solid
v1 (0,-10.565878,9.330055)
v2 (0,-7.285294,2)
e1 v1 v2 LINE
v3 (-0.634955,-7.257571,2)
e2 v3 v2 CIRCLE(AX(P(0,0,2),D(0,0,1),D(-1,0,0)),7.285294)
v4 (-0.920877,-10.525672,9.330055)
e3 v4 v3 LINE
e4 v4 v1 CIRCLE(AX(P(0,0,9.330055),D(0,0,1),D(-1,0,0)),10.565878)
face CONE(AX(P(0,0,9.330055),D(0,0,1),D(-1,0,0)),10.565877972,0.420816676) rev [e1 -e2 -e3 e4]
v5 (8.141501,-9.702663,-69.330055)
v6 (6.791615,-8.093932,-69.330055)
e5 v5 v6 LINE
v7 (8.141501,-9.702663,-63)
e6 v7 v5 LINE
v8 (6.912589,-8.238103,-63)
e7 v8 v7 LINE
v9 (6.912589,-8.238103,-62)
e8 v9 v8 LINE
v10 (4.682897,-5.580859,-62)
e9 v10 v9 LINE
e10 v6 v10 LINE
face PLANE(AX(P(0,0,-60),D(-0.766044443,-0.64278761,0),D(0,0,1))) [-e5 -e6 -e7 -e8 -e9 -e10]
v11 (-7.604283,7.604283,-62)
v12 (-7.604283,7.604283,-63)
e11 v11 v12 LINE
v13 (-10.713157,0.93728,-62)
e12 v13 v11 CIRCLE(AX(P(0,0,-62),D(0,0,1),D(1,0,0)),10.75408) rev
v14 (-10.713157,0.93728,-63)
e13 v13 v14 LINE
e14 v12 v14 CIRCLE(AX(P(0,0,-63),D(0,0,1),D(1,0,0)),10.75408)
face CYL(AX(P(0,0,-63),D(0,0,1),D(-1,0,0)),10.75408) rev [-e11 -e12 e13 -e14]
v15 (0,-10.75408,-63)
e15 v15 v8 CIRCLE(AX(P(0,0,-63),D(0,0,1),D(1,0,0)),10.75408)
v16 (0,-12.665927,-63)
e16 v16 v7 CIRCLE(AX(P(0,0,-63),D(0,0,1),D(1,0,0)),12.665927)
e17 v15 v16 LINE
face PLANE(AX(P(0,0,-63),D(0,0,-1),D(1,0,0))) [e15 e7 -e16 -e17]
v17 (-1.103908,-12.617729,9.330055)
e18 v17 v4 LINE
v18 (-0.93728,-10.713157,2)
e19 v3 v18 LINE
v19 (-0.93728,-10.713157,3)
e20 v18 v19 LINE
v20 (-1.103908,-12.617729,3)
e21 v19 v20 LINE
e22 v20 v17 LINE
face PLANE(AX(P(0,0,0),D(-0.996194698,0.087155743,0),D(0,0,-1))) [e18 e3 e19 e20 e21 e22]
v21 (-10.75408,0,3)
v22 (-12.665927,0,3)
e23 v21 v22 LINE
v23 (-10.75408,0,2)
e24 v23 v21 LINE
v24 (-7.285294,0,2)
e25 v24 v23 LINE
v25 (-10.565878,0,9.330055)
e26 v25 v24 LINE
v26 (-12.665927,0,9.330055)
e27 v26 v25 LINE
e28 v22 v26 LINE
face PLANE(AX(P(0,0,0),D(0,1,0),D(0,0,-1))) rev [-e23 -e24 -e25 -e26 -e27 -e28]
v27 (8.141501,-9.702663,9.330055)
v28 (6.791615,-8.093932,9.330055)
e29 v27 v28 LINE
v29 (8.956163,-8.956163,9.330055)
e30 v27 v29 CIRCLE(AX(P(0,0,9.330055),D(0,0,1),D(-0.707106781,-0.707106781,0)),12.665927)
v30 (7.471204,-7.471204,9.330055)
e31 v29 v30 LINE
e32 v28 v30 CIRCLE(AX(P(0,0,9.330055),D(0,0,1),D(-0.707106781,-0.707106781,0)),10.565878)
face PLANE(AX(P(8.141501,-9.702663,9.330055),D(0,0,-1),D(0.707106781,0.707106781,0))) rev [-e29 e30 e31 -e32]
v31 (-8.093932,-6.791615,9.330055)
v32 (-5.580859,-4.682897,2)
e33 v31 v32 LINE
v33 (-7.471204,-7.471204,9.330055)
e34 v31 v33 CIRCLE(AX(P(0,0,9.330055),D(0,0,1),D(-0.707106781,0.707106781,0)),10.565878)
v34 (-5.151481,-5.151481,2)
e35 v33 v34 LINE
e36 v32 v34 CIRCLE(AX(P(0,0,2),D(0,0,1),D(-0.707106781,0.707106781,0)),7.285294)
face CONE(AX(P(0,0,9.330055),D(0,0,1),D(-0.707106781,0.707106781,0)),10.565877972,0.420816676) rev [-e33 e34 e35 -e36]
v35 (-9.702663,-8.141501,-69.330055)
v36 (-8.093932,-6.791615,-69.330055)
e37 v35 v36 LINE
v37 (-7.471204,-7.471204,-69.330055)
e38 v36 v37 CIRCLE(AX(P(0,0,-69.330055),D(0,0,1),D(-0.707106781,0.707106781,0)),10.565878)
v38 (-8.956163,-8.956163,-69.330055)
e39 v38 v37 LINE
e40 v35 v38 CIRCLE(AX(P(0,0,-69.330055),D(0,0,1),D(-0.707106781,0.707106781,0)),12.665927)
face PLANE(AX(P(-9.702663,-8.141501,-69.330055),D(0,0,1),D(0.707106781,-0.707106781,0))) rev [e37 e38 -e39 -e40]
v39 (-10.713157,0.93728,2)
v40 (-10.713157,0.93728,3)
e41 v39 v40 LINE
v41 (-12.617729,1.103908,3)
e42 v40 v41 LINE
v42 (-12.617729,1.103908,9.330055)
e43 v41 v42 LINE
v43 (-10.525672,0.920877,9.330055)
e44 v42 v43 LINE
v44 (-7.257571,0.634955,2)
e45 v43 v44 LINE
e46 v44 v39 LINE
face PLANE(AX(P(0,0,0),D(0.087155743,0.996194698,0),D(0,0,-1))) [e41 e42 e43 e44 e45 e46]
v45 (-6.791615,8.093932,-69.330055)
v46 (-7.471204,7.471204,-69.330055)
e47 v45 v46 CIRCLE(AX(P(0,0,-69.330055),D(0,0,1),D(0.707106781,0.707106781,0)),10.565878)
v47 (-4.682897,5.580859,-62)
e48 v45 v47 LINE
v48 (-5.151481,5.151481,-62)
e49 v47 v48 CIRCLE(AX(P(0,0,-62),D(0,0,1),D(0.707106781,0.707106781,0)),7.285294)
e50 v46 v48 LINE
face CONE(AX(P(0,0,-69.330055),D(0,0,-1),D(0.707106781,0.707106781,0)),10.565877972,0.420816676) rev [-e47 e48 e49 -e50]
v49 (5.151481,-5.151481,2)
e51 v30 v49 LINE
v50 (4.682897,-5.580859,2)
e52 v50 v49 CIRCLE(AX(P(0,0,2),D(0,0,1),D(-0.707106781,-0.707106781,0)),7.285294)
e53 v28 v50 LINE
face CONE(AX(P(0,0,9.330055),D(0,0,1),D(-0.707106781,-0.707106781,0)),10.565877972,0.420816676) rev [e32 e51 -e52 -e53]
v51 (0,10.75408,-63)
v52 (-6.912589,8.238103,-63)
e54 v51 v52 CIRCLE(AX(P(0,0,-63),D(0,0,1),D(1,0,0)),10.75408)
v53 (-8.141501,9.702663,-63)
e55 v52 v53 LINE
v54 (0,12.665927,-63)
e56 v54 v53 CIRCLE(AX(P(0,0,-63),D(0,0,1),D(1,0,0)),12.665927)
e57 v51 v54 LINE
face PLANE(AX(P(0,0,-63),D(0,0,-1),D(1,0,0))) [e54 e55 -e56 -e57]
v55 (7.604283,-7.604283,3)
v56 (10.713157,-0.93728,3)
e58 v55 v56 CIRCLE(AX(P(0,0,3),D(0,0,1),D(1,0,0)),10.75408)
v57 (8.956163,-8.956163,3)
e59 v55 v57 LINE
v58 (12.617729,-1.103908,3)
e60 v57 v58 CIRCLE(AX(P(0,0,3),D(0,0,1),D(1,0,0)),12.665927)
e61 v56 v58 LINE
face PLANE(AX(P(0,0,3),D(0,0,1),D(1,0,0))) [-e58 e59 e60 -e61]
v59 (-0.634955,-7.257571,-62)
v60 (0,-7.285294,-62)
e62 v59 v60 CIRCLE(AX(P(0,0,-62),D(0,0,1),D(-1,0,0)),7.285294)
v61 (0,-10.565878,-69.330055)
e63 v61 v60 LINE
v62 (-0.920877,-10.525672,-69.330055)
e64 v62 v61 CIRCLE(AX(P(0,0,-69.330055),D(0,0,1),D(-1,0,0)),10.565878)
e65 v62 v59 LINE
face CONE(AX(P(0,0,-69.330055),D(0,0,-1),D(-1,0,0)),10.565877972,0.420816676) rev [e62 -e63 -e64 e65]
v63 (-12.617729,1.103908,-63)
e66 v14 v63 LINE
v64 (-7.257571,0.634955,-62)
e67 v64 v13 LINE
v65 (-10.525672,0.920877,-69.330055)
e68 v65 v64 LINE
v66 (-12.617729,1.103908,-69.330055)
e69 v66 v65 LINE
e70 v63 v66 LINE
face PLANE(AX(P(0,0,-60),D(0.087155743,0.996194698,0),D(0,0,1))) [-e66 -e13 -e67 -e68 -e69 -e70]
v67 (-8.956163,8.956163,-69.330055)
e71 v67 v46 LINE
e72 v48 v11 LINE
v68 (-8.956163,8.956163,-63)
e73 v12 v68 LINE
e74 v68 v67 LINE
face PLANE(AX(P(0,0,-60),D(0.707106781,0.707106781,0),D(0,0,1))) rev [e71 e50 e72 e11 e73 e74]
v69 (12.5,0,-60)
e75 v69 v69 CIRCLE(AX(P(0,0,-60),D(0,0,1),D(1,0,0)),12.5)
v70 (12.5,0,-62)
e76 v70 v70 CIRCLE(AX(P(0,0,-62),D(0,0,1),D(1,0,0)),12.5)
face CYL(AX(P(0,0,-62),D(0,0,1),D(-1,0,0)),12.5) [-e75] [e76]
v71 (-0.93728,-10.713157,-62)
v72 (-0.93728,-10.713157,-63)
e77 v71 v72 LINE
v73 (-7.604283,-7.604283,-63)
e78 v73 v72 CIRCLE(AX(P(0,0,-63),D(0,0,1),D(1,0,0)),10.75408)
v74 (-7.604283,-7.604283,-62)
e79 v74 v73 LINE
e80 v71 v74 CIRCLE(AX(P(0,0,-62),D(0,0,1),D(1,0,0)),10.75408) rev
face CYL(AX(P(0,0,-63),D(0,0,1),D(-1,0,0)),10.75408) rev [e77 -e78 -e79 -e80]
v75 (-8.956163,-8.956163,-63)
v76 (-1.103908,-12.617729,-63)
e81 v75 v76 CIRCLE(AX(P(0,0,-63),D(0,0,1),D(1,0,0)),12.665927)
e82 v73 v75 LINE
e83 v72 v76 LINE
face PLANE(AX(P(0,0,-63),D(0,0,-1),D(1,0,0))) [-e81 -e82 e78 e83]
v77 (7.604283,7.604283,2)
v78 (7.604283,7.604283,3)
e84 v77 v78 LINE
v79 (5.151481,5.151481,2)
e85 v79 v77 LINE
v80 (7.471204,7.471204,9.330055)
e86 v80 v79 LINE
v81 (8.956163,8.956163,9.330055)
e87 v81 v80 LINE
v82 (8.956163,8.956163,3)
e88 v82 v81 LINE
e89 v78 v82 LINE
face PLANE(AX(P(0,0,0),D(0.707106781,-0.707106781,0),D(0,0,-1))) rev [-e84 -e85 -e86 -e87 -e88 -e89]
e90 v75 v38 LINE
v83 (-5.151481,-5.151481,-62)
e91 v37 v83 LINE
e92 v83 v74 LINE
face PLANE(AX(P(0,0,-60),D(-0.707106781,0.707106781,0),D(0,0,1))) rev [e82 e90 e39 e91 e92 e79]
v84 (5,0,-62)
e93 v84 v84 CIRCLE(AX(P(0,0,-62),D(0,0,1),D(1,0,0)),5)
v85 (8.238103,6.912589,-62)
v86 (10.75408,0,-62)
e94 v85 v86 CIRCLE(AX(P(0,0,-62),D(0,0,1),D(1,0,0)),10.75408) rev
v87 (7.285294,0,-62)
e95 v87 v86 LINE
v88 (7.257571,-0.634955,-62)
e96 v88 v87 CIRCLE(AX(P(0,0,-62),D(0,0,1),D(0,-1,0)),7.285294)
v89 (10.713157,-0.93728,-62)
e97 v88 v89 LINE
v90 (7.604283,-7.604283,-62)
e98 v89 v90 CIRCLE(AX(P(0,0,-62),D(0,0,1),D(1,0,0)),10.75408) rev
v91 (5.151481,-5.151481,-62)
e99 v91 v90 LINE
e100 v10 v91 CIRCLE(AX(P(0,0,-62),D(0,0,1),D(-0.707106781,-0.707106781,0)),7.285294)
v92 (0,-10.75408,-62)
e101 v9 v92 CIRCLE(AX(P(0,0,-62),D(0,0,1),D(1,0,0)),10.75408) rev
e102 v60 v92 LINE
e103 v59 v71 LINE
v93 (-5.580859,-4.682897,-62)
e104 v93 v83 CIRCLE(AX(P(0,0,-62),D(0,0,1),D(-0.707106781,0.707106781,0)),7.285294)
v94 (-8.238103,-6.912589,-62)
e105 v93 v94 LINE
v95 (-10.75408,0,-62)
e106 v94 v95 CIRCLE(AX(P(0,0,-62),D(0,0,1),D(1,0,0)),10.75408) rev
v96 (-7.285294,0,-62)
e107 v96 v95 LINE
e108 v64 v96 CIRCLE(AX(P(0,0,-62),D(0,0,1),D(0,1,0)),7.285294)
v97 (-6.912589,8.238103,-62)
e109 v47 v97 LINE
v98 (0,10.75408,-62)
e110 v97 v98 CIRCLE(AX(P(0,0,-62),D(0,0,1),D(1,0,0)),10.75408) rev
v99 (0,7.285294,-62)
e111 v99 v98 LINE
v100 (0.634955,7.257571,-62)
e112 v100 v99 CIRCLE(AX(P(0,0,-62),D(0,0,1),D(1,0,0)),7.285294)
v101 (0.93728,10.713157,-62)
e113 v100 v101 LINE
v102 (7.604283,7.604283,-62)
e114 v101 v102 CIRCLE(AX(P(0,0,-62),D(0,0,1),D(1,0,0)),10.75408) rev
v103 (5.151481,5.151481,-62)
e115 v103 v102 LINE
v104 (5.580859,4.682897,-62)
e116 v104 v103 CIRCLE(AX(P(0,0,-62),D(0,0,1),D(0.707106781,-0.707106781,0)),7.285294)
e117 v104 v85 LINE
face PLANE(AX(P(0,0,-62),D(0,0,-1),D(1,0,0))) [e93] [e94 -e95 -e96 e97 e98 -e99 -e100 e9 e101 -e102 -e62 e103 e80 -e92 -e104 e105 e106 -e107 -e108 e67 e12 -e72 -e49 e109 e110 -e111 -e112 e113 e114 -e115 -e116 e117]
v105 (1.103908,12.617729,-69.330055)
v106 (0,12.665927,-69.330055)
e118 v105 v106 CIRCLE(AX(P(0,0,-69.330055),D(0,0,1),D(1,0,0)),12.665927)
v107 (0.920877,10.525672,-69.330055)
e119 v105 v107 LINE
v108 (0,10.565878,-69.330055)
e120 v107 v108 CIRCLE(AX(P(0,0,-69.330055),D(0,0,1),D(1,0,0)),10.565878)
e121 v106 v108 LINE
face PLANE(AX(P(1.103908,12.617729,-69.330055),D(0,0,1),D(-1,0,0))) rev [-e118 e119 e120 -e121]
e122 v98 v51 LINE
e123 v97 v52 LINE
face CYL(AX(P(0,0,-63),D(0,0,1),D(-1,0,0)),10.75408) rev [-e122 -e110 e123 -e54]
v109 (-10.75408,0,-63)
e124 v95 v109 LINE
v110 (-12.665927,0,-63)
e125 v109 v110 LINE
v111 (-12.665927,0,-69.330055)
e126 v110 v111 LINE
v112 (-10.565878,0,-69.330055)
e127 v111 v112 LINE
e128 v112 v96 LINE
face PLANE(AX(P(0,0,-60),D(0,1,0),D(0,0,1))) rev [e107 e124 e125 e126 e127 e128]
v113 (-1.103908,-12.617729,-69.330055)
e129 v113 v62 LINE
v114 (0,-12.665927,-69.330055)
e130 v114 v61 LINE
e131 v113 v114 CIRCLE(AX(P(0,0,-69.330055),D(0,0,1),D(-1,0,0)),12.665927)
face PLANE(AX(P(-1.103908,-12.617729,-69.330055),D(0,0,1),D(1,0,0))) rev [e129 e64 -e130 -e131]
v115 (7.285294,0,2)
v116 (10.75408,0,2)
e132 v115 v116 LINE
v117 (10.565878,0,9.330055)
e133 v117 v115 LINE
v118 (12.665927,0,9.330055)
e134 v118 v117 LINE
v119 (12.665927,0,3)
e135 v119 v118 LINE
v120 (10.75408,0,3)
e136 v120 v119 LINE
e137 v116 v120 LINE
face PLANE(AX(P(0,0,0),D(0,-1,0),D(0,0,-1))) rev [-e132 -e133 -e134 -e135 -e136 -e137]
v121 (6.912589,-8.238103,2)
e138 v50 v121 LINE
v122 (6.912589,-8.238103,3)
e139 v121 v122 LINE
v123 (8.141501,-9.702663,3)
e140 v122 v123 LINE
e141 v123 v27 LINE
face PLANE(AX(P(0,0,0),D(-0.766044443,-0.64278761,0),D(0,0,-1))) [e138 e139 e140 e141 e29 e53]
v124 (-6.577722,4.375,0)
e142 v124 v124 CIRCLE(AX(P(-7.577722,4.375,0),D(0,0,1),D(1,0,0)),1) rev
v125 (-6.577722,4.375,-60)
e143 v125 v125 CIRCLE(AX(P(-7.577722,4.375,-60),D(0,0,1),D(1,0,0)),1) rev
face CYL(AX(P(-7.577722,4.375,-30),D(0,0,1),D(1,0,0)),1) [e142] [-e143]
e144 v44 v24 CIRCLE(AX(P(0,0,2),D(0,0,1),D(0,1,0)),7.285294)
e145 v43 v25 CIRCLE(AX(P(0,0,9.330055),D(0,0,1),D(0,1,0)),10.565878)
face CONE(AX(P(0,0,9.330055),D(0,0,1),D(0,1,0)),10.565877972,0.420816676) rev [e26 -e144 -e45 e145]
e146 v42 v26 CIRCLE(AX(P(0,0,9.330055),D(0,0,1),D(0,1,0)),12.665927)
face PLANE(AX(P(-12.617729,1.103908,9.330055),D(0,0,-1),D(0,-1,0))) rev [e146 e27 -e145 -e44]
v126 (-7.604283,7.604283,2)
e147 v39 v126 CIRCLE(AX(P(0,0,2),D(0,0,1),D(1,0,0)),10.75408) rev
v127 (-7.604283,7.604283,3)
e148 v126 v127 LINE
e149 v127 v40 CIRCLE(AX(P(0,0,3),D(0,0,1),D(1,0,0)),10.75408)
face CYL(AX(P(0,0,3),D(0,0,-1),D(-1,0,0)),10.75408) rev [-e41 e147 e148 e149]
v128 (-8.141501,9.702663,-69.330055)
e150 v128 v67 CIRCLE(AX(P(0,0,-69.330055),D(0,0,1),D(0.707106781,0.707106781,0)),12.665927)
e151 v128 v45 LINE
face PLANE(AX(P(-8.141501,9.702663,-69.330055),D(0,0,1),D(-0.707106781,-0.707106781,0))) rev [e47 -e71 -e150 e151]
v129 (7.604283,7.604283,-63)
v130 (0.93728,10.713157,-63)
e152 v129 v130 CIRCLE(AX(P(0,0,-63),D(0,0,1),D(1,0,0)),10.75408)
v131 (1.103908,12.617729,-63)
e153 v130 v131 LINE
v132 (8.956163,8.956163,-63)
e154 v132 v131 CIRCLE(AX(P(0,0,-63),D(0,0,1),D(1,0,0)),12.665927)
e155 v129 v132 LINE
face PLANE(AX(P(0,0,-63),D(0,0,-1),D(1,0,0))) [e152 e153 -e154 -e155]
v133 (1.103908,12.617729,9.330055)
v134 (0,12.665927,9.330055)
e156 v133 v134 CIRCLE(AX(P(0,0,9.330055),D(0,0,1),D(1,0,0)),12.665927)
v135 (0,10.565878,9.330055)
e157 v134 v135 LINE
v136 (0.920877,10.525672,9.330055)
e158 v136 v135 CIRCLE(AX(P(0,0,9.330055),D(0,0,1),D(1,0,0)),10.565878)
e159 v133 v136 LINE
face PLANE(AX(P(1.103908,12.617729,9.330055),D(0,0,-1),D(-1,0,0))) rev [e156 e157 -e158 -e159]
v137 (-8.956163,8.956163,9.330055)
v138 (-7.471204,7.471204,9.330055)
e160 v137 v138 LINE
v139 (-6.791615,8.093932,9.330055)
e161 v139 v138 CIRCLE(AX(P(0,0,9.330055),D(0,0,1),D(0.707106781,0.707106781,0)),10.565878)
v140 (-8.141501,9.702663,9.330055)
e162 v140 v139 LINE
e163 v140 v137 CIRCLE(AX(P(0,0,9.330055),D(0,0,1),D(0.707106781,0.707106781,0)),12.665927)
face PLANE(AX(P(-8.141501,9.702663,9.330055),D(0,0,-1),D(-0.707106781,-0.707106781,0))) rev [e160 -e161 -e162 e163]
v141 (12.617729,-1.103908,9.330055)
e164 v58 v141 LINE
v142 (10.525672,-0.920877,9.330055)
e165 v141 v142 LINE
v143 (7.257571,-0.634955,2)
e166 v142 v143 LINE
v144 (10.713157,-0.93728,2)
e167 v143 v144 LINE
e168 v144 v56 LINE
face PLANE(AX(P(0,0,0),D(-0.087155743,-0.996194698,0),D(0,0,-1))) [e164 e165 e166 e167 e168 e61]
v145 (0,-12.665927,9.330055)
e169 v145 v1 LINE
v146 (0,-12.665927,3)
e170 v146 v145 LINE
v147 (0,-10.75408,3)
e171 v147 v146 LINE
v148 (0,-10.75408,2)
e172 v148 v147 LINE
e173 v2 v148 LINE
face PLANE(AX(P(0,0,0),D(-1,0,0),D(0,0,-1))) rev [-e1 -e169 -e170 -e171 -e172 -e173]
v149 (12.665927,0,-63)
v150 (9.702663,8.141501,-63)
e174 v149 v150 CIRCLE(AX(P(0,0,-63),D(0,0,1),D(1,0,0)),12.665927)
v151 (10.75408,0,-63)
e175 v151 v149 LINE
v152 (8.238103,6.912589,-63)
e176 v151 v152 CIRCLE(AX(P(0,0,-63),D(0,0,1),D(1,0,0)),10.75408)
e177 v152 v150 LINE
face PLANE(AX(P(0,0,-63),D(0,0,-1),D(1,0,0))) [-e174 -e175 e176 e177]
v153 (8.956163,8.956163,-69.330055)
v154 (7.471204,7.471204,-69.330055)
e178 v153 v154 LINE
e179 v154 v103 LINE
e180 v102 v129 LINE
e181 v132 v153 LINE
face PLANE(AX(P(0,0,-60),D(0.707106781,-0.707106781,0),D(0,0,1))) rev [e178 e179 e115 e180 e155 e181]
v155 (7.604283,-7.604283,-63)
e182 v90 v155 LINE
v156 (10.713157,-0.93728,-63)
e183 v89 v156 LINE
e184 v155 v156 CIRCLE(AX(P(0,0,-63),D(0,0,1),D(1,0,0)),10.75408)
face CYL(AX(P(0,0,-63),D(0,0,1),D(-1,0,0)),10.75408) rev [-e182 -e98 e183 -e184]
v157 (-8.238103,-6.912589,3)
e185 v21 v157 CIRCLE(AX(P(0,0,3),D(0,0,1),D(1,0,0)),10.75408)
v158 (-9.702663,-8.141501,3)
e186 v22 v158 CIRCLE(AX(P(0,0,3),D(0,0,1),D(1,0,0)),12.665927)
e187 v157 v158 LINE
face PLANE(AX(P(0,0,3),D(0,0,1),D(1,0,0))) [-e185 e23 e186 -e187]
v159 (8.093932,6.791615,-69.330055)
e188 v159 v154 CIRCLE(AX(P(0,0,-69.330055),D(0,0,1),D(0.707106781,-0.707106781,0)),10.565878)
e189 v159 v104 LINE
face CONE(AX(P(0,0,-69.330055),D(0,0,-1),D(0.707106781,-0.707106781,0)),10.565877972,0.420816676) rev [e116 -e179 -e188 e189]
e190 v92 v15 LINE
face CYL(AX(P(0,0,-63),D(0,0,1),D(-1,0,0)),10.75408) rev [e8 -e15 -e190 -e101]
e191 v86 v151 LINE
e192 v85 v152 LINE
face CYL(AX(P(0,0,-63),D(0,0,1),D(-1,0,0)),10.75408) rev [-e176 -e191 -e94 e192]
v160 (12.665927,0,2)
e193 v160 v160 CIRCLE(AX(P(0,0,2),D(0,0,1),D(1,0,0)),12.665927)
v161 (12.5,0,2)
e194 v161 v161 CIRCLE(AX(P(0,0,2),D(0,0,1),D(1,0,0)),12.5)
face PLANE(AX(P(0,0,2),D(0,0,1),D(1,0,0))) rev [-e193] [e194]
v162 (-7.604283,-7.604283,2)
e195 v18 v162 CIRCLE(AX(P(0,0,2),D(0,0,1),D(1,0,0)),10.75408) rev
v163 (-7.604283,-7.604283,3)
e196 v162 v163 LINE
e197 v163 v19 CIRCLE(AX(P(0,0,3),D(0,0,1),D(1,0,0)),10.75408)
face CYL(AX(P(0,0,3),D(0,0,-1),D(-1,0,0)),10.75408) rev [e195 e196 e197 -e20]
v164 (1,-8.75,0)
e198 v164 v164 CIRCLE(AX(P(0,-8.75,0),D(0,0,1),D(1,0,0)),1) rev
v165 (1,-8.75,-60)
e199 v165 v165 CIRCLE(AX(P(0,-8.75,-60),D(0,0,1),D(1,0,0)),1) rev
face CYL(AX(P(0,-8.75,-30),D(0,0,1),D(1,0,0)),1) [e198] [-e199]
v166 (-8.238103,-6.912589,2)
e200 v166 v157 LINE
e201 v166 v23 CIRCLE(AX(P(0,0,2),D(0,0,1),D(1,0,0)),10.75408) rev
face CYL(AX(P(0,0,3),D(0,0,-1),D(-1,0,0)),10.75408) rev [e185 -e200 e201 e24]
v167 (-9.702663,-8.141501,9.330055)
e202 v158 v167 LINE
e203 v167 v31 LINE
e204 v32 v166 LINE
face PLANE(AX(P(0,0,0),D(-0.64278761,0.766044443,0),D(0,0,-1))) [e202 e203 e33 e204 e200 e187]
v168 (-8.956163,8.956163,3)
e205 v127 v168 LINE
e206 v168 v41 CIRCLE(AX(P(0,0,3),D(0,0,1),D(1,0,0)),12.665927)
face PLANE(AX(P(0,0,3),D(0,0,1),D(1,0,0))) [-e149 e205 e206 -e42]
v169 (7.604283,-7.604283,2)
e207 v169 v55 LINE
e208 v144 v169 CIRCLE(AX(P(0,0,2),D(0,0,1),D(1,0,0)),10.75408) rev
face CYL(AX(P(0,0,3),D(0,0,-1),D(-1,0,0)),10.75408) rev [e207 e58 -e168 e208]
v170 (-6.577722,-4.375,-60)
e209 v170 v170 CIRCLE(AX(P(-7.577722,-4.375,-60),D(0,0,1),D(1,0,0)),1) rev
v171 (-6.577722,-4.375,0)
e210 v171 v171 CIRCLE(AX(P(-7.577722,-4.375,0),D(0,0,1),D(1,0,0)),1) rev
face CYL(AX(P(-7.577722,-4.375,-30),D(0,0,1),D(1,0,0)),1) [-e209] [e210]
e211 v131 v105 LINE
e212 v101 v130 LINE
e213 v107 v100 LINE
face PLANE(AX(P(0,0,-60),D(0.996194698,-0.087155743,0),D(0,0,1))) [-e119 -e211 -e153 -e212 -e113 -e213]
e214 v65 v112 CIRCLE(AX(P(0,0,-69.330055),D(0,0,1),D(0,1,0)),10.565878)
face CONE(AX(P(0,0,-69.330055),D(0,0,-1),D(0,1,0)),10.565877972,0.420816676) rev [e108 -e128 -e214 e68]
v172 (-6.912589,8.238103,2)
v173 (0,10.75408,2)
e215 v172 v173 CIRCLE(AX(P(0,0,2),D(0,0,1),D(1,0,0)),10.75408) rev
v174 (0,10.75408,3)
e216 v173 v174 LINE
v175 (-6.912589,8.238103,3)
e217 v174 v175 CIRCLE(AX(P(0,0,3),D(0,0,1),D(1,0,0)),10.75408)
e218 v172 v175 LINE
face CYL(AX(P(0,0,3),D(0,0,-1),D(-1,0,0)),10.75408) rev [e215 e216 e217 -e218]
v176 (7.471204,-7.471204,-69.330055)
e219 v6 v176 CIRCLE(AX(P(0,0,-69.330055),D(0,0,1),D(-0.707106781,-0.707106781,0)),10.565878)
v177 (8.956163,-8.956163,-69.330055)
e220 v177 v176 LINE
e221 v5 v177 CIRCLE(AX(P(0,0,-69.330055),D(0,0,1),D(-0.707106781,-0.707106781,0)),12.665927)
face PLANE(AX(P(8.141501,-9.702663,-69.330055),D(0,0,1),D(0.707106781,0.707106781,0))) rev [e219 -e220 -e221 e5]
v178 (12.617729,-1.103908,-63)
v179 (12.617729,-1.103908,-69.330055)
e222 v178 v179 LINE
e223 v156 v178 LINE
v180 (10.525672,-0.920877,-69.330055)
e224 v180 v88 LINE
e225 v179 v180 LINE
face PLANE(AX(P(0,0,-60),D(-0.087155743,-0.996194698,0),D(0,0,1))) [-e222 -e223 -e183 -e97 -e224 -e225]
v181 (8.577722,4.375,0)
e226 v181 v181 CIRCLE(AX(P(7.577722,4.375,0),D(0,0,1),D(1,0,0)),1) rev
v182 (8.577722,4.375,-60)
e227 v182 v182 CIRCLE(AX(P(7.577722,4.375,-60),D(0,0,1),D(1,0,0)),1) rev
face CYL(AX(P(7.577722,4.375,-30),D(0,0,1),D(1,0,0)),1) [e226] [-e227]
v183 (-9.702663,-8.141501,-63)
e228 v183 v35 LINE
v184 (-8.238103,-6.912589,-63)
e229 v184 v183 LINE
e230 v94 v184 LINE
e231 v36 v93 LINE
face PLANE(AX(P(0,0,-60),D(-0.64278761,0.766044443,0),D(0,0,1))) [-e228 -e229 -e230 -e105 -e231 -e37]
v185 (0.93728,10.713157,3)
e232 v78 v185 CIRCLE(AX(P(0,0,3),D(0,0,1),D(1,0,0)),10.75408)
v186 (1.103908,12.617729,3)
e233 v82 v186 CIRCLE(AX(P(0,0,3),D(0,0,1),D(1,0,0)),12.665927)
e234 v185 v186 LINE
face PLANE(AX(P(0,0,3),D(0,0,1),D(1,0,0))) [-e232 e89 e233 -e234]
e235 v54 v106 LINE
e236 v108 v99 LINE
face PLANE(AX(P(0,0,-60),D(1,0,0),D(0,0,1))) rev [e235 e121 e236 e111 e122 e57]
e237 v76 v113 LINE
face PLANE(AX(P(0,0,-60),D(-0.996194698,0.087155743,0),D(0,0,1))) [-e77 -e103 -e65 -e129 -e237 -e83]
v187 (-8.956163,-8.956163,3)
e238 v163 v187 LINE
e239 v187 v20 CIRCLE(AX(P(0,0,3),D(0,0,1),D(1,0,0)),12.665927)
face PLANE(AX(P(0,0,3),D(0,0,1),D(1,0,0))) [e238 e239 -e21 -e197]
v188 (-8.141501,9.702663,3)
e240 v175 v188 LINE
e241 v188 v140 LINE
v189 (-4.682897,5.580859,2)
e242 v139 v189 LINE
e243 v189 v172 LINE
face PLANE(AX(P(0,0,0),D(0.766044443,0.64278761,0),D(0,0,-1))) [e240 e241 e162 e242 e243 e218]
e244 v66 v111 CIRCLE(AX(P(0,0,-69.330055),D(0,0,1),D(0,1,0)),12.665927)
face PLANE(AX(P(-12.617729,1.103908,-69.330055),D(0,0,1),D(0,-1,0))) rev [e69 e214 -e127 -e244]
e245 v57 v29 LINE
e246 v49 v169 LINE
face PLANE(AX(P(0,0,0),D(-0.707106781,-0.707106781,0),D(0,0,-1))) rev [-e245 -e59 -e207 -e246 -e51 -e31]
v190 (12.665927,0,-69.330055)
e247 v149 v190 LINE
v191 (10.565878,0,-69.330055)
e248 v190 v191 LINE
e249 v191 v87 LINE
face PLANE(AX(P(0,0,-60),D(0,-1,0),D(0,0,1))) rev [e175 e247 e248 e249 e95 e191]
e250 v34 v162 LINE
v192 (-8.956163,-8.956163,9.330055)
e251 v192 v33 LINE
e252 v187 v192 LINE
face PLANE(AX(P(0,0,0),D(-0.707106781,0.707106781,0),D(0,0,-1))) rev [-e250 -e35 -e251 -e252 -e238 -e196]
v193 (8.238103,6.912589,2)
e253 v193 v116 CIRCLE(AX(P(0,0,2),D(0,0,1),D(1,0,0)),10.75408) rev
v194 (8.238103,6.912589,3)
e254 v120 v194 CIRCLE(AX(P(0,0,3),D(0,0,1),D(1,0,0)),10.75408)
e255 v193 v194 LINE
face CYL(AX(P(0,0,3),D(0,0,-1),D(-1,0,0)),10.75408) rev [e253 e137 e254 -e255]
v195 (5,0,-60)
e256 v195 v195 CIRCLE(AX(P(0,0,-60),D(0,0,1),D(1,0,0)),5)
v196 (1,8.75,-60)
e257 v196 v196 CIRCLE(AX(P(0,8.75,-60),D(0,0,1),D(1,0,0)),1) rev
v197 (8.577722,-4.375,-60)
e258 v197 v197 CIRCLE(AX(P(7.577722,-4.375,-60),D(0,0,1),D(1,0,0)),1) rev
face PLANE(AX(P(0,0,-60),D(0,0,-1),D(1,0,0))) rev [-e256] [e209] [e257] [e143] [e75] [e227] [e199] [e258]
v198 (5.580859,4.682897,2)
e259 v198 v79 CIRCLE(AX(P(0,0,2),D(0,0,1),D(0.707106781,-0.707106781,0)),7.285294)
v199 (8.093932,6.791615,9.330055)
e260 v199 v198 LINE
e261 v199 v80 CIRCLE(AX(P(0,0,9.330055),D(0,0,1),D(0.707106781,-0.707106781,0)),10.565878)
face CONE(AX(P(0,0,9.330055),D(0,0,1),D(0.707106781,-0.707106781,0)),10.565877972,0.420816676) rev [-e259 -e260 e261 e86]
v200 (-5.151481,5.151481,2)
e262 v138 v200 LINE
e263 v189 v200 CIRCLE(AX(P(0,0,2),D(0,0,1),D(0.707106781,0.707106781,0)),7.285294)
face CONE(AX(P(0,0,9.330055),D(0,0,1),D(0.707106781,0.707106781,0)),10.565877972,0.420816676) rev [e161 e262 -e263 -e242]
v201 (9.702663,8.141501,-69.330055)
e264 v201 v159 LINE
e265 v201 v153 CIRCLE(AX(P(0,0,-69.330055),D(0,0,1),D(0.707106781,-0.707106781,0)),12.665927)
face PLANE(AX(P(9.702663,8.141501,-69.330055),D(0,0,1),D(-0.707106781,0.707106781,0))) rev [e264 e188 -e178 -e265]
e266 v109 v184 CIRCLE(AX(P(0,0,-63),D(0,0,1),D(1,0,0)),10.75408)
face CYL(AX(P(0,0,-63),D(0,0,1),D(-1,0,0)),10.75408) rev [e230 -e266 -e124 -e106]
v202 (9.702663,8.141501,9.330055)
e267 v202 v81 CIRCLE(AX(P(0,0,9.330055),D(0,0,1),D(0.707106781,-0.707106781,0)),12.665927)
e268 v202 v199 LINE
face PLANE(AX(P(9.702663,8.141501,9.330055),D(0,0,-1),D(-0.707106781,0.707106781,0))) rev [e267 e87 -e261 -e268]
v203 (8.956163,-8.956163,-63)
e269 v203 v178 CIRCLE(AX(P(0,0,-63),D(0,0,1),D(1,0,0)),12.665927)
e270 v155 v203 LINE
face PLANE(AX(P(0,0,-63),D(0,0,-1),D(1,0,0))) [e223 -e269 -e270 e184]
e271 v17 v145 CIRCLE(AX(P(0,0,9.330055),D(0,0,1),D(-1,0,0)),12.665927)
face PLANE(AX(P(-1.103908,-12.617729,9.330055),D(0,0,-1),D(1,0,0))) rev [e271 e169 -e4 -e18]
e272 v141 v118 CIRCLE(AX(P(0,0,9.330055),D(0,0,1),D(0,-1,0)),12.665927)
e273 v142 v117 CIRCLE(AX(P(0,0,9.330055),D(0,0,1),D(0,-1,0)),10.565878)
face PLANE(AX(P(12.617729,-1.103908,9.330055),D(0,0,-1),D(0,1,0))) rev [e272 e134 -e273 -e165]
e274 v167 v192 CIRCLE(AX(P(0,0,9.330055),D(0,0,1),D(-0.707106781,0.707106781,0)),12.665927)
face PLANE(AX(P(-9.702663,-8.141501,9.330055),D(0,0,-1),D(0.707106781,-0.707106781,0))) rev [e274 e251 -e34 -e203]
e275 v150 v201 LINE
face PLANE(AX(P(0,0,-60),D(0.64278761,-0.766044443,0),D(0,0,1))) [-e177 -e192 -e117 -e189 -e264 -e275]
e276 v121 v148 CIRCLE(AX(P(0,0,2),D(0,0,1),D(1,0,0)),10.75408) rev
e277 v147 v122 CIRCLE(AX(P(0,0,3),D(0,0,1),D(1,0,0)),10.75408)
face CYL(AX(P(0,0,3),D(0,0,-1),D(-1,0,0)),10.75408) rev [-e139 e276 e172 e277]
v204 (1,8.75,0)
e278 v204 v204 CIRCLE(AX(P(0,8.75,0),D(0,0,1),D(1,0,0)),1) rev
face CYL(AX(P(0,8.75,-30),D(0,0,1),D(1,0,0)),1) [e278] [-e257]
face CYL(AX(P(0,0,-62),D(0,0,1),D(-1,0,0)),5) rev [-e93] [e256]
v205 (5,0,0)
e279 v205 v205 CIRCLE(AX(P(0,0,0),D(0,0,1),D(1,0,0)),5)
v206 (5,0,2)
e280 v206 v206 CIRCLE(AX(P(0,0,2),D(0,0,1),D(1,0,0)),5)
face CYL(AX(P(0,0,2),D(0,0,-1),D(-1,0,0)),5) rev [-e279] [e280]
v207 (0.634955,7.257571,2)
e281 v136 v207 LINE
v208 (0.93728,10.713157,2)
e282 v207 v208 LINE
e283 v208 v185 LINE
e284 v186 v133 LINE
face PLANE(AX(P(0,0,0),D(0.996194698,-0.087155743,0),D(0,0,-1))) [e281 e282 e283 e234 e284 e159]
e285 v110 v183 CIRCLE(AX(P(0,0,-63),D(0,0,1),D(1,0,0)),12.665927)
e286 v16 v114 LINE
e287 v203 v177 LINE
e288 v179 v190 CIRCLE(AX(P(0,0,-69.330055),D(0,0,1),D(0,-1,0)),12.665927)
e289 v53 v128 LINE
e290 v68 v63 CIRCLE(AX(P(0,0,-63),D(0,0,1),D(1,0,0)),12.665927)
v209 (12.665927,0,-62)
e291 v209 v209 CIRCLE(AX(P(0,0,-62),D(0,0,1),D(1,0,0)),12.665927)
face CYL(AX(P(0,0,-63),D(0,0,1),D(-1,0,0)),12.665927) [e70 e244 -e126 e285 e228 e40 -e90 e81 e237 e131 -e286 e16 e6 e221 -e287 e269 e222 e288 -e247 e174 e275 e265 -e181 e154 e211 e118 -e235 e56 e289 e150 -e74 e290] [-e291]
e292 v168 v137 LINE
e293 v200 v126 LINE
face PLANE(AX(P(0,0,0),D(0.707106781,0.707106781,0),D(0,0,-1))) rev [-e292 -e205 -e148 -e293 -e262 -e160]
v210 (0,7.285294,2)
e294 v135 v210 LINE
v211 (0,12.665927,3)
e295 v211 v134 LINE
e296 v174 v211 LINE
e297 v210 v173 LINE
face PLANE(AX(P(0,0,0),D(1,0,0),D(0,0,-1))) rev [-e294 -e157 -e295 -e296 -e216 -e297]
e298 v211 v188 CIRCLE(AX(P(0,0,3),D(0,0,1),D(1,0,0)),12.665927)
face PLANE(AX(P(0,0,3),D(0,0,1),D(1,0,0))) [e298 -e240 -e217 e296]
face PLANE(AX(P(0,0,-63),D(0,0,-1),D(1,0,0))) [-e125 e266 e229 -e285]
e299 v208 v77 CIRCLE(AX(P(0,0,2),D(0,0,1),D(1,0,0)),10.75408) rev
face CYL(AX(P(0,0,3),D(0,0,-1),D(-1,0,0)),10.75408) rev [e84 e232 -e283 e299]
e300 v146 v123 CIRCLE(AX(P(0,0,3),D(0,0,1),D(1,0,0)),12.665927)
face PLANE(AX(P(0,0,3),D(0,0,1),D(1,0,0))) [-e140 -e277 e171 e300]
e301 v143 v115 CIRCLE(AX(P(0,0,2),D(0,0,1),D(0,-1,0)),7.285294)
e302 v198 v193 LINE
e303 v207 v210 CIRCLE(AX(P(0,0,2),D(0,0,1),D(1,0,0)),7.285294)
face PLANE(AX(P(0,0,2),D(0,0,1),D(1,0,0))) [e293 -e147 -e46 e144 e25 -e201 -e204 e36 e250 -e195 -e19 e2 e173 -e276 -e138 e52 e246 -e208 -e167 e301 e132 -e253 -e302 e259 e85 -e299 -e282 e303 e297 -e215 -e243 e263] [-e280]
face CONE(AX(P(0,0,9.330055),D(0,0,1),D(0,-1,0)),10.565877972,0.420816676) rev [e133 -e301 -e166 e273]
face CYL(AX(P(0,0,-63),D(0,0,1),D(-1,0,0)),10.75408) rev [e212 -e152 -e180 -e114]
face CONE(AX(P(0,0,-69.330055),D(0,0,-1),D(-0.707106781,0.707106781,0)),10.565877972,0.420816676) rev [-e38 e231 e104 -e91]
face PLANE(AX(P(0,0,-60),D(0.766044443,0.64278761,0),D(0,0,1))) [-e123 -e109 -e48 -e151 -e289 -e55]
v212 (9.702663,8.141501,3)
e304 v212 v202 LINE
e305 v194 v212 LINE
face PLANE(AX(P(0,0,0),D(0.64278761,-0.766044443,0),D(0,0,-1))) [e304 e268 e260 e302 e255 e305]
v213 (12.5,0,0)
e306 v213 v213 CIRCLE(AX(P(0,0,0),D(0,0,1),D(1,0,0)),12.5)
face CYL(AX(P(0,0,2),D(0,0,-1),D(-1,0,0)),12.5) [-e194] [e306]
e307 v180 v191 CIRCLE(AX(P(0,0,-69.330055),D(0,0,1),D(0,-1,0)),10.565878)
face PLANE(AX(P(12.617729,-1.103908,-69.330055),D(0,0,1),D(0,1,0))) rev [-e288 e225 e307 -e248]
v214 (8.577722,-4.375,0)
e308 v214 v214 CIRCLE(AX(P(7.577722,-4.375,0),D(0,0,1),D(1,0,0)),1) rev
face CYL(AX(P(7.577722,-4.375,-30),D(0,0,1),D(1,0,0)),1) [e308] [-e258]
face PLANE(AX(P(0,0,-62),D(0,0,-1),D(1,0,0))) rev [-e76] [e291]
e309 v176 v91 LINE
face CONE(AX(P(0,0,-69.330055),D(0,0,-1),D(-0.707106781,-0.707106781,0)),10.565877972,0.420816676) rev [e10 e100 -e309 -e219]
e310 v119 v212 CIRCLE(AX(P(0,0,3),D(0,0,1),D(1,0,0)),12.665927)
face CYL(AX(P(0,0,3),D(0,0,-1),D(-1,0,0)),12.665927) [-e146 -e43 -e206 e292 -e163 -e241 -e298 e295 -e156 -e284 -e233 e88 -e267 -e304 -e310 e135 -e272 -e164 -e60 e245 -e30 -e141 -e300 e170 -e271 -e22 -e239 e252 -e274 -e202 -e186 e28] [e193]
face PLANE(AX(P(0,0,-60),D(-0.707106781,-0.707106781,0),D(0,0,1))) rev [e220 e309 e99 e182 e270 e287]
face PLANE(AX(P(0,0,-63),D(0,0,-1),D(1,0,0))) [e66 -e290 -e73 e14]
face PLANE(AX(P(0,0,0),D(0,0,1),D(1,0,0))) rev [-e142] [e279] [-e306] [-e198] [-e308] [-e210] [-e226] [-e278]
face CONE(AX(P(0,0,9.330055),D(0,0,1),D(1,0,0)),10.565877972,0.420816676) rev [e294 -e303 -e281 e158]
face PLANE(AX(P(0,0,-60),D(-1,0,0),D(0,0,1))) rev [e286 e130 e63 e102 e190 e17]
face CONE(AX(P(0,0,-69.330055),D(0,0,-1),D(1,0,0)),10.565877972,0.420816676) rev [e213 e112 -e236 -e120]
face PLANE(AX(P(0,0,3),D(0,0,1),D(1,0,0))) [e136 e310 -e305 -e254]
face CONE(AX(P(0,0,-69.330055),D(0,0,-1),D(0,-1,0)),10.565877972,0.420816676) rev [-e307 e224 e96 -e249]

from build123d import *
from build123d.topology import SkipClean

# Parameters (mm, degrees)
SKETCH1_R           = 12.5
SKETCH1_R_2         = 5
BOSS_EXTRUDE1_DEPTH = 2
SKETCH3_R           = 12.665926605
SKETCH3_R_2         = 10.754079628
BOSS_EXTRUDE4_DEPTH = 1
REVOLVE1_ANGLE      = 5
CIRPATTERN1_COUNT   = 8
SKETCH5_R           = 1
BOSS_EXTRUDE5_DEPTH = 30
CIRPATTERN2_COUNT   = 6


with BuildPart() as part:
    # Sketch1 → Boss-Extrude1 (new body)
    with BuildSketch(Plane.XY):
        Circle(SKETCH1_R)
        Circle(SKETCH1_R_2, mode=Mode.SUBTRACT)
    extrude(amount=BOSS_EXTRUDE1_DEPTH)

    # Sketch3 → Boss-Extrude4 (add)
    with BuildSketch(Plane.XY.offset(2)):
        Circle(SKETCH3_R)
        Circle(SKETCH3_R_2, mode=Mode.SUBTRACT)
    extrude(amount=BOSS_EXTRUDE4_DEPTH)

    # Sketch4 → Revolve1 (revolve)
    with SkipClean():  # the faces are left unmerged after this step: merging them gives an invalid solid
        with BuildSketch(Plane(origin=(0, 0, 0), x_dir=(0, 0, -1), z_dir=(1, 0, 0))):
            Polygon((-9.330054786, 12.665926605), (-9.330054786, 10.565877972), (-2, 7.285294012), (-2, 12.665926605), align=None)
        revolve1 = revolve(axis=Axis((0, 0, 9.312529427), (0, 0, -1)), revolution_arc=REVOLVE1_ANGLE)
    add(part.part.scale(1), mode=Mode.REPLACE)  # the faces are merged on a copy

    # CirPattern1: Revolve1 ×8 about axis
    cirpattern1_axis = Axis((0, 0, 9.312529427), (0, 0, -1))
    for i in range(1, CIRPATTERN1_COUNT):
        add(revolve1.rotate(cirpattern1_axis, i * 360 / CIRPATTERN1_COUNT))

    # Sketch5 → Boss-Extrude5 (add)
    with BuildSketch(Plane(origin=(0, 0, 0), x_dir=(-1, 0, 0), z_dir=(0, 0, -1))):
        with Locations((0, 8.75)):
            Circle(SKETCH5_R)
    boss_extrude5 = extrude(amount=BOSS_EXTRUDE5_DEPTH)

    # CirPattern2: Boss-Extrude5 ×6 about axis
    cirpattern2_axis = Axis((0, 0, 9.312529427), (0, 0, -1))
    for i in range(1, CIRPATTERN2_COUNT):
        add(boss_extrude5.rotate(cirpattern2_axis, i * 360 / CIRPATTERN2_COUNT))

    # Mirror4: part across plane


with BuildPart() as part_1:
    add(part.part)
    add(part.part.mirror(Plane.XY.offset(-30)))


solid = part_1.part
